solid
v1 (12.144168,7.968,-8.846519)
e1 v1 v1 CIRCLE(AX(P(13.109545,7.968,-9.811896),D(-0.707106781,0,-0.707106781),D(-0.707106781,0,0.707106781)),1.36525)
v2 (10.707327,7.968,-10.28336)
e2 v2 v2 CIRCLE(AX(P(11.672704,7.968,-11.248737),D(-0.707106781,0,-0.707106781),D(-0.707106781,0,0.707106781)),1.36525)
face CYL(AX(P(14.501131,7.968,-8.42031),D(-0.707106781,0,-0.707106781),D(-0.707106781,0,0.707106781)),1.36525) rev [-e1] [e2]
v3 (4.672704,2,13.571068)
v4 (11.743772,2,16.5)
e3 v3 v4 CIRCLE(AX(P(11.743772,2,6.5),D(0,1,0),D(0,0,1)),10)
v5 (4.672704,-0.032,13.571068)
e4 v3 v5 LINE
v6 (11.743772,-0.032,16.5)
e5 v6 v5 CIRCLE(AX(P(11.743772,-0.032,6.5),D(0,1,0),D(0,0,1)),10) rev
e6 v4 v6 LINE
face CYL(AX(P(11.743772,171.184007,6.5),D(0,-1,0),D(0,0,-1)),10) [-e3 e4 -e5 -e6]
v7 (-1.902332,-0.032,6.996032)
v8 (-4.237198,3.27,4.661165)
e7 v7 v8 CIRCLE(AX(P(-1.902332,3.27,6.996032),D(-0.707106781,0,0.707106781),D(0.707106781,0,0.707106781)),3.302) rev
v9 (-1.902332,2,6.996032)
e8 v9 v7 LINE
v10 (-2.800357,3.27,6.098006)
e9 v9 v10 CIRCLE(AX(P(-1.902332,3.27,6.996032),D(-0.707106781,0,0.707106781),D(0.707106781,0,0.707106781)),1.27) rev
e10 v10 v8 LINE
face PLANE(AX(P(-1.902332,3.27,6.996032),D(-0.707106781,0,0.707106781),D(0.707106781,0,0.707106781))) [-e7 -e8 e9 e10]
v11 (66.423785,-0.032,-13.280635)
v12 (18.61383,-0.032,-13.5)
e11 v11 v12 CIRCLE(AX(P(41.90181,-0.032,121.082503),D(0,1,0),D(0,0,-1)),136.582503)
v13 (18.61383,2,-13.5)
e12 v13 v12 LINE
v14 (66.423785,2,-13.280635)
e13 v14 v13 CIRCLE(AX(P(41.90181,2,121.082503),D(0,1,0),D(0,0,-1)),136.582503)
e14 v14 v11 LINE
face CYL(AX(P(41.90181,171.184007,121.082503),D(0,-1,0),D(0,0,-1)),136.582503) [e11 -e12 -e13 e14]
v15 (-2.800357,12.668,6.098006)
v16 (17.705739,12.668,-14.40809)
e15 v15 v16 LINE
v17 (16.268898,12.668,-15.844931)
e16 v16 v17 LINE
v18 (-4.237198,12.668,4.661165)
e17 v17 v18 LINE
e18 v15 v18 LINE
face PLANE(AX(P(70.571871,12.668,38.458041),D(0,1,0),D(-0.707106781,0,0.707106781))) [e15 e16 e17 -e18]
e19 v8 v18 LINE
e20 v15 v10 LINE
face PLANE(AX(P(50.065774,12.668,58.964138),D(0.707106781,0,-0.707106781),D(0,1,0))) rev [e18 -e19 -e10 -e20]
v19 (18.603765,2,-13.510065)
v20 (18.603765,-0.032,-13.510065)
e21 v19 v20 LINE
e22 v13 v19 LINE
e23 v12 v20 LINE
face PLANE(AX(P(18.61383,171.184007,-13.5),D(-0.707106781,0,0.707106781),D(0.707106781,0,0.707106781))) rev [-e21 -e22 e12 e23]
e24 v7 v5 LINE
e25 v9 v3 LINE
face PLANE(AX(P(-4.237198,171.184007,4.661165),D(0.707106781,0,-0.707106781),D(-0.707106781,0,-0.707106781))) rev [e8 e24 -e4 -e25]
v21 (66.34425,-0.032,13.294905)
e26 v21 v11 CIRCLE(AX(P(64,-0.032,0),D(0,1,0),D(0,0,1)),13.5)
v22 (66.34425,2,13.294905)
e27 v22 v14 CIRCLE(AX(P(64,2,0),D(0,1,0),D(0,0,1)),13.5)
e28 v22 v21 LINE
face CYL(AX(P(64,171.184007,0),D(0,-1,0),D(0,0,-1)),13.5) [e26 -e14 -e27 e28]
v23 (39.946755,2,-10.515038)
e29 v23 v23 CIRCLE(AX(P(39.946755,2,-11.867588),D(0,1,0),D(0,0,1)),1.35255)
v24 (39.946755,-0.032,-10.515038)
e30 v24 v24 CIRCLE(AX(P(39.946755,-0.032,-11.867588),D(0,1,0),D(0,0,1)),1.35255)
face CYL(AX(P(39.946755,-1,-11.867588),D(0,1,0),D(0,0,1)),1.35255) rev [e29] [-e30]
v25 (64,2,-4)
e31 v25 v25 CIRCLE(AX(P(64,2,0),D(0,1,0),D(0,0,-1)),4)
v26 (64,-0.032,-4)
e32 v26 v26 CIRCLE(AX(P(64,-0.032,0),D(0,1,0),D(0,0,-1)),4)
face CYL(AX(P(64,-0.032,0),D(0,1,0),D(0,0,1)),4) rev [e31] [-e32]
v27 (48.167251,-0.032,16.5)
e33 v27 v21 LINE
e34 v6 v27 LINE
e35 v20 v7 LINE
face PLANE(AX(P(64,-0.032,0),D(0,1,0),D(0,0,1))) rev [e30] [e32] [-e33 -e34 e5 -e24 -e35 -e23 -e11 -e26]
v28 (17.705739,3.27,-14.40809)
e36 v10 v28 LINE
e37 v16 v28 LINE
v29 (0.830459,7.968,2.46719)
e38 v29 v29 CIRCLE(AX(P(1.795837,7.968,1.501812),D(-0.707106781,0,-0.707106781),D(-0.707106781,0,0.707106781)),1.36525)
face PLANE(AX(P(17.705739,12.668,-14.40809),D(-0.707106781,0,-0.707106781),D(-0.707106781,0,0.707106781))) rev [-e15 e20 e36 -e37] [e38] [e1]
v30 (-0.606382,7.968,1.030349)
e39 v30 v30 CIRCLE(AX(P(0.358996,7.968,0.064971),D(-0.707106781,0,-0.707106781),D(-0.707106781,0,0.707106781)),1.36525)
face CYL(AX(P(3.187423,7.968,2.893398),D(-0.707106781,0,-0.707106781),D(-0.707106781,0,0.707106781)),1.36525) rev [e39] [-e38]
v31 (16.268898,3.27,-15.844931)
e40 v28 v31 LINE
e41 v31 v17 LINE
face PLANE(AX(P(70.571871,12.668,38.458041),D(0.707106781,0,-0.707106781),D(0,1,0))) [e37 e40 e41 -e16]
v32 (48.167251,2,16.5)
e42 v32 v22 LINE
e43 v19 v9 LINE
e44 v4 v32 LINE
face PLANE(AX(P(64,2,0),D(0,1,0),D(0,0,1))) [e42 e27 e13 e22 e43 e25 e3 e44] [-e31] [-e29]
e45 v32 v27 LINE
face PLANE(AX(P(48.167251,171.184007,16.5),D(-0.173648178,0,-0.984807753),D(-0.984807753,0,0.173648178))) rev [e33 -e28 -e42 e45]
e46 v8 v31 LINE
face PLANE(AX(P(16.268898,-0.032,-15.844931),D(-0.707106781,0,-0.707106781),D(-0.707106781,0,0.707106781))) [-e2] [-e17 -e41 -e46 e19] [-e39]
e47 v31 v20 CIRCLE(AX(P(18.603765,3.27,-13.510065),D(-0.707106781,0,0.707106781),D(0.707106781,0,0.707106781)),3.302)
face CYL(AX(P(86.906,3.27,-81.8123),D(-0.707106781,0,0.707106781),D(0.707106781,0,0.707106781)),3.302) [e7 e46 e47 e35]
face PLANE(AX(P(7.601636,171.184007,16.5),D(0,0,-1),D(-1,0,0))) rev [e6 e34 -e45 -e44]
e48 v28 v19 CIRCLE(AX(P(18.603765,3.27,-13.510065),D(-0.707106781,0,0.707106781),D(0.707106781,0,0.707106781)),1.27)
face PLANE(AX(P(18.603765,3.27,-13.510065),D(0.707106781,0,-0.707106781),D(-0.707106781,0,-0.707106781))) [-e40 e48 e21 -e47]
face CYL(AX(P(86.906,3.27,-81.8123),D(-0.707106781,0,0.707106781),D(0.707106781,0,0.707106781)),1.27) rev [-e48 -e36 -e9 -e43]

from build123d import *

# Parameters (mm, degrees)
SKETCH1_R                  = 4
BOSS_EXTRUDE1_DEPTH        = 2.032
BOSS_EXTRUDE3_DEPTH        = 10.668
SKETCH12_R                 = 1.36525
CUT_EXTRUDE2_DEPTH         = 4
CUT_EXTRUDE3_DEPTH         = 6
CUT_EXTRUDE3_DEPTH_BACK    = 1
SKETCH14_R                 = 1.35255
FILLET1_R                  = 10
FLATTEN_BENDS1_START       = 2
FLATTEN_BENDS1_DEPTH       = 10.668
FLATTEN_BENDS1_START_2     = -0.032
FLATTEN_BENDS1_2_OUTLINE_R = 1.36525
FLATTEN_BENDS1_2_DEPTH     = 2.032
PROCESS_BENDS1_START       = -9.067864684
PROCESS_BENDS1_OUTLINE_W   = 29
PROCESS_BENDS1_OUTLINE_H   = 2.032
PROCESS_BENDS1_DEPTH       = 9.398
PROCESS_BENDS1_START_2     = 0.620942425
PROCESS_BENDS1_2_OUTLINE_W = 29
PROCESS_BENDS1_2_OUTLINE_H = 10.668
PROCESS_BENDS1_2_OUTLINE_R = 1.36525
PROCESS_BENDS1_2_DEPTH     = 1.71084748
PROCESS_BENDS1_START_3     = 0.330135316
PROCESS_BENDS1_3_OUTLINE_W = 29
PROCESS_BENDS1_3_OUTLINE_H = 2.032
PROCESS_BENDS1_3_DEPTH     = 0.184274429
PROCESS_BENDS1_START_4     = 0.299789905
PROCESS_BENDS1_4_OUTLINE_W = 29
PROCESS_BENDS1_4_OUTLINE_H = 10.668
PROCESS_BENDS1_4_OUTLINE_R = 1.36525
PROCESS_BENDS1_4_DEPTH     = 3.302
PROCESS_BENDS1_START_5     = -6.292093187
PROCESS_BENDS1_5_DEPTH     = 29


with BuildPart() as part:
    # Sketch1 → Boss-Extrude1 (new body)
    with BuildSketch(Plane(origin=(0, 2, 0), x_dir=(1, 0, 0), z_dir=(0, 1, 0))):
        with BuildLine():
            Line((16.268898369, 15.844931419), (-4.237198285, -4.661165235))
            Line((-4.237198285, -4.661165235), (7.60163648, -16.5))
            Line((7.60163648, -16.5), (48.167251499, -16.5))
            Line((48.167251499, -16.5), (66.344250399, -13.294904666))
            ThreePointArc((66.344250399, -13.294904666), (77.499939542, -0.040402458), (66.423785357, 13.280634945))
            ThreePointArc((66.423785357, 13.280634945), (42.528480772, 15.498562339), (18.613829789, 13.5))
            Line((18.613829789, 13.5), (16.268898369, 15.844931419))
        make_face()
        with Locations(Location((64, 0, 0), (0, 0, 90))):
            Circle(SKETCH1_R, mode=Mode.SUBTRACT)
    extrude(amount=-BOSS_EXTRUDE1_DEPTH)

    # Sketch5 → Boss-Extrude3 (add)
    with BuildSketch(Plane(origin=(0, 2, 0), x_dir=(1, 0, 0), z_dir=(0, 1, 0))):
        Polygon((16.268898369, 15.844931419), (-4.237198285, -4.661165235), (-2.800357306, -6.098006215), (17.705739349, 14.40809044), align=None)
    extrude(amount=BOSS_EXTRUDE3_DEPTH)

    # Sketch12 → Cut-Extrude2 (cut)
    with BuildSketch(Plane(origin=(0.211983475, 0, 0.211983475), x_dir=(-0.7071067811865475, 0, 0.7071067811865477), z_dir=(-0.7071067811865477, 0, -0.7071067811865475))):
        with Locations((-16.207906813, 7.968)):
            Circle(SKETCH12_R)
        with Locations((-0.207906813, 7.968)):
            Circle(SKETCH12_R)
    extrude(amount=-CUT_EXTRUDE2_DEPTH, mode=Mode.SUBTRACT)

    # Sketch14 → Cut-Extrude3 (cut, two sides: drawn at the far end of the back side and taken through both)
    with BuildSketch(Plane(origin=(0, 0, 0), x_dir=(1, 0, 0), z_dir=(0, 1, 0)).offset(-CUT_EXTRUDE3_DEPTH_BACK)):
        with Locations(Location((39.946755384, 11.867587507, 0), (0, 0, 270))):
            Circle(SKETCH14_R)
    extrude(amount=CUT_EXTRUDE3_DEPTH + CUT_EXTRUDE3_DEPTH_BACK, mode=Mode.SUBTRACT)

    # Fillet1
    fillet1_edges = [part.edges().sort_by_distance(p)[0] for p in [
        (7.60163648, 0.984, 16.5),
    ]]
    fillet(fillet1_edges, radius=FILLET1_R)

    # Flatten-Bends1: read off the stored shape, not the designer's step
    # Flatten-Bends1 outline → Flatten-Bends1 (cut)
    with BuildSketch(Plane(origin=(0, 0, 0), x_dir=(1, 0, 0), z_dir=(0, 1, 0)).offset(FLATTEN_BENDS1_START)):
        Polygon((17.705739349, 14.40809044), (16.290355815, 15.823473974), (16.268898369, 15.844931419), (-4.237198285, -4.661165235), (-2.800357306, -6.098006215), align=None)
    extrude(amount=FLATTEN_BENDS1_DEPTH, mode=Mode.SUBTRACT)

    # Flatten-Bends1 2 outline → Flatten-Bends1 2 (add)
    with BuildSketch(Plane(origin=(0, 0, 0), x_dir=(1, 0, 0), z_dir=(0, 1, 0)).offset(FLATTEN_BENDS1_START_2)):
        Polygon((-4.237198285, -4.661165235), (16.268898369, 15.844931419), (9.644966285, 22.468863503), (-10.861130369, 1.962766849), align=None)
        with Locations((-2.94153442, 3.235559055)):
            Circle(FLATTEN_BENDS1_2_OUTLINE_R, mode=Mode.SUBTRACT)
        with Locations((8.372174079, 14.549267554)):
            Circle(FLATTEN_BENDS1_2_OUTLINE_R, mode=Mode.SUBTRACT)
    extrude(amount=FLATTEN_BENDS1_2_DEPTH)

    # Process-Bends1: read off the stored shape, not the designer's step
    # Process-Bends1 outline → Process-Bends1 (cut)
    with BuildSketch(Plane(origin=(0, 0, 0), x_dir=(0.7071067811865474, 0, -0.7071067811865477), z_dir=(0.7071067811865476, 0, 0.7071067811865476)).offset(PROCESS_BENDS1_START)):
        with Locations((8.207906813, 0.984)):
            Rectangle(PROCESS_BENDS1_OUTLINE_W, PROCESS_BENDS1_OUTLINE_H)
    extrude(amount=PROCESS_BENDS1_DEPTH, mode=Mode.SUBTRACT)

    # Process-Bends1 2 outline → Process-Bends1 2 (add)
    with BuildSketch(Plane(origin=(0, 0, 0), x_dir=(0.7071067811865474, 0, -0.7071067811865477), z_dir=(0.7071067811865476, 0, 0.7071067811865476)).offset(PROCESS_BENDS1_START_2)):
        with Locations((8.207906813, 7.334)):
            Rectangle(PROCESS_BENDS1_2_OUTLINE_W, PROCESS_BENDS1_2_OUTLINE_H)
        with Locations((0.207906813, 7.968)):
            Circle(PROCESS_BENDS1_2_OUTLINE_R, mode=Mode.SUBTRACT)
        with Locations((16.207906813, 7.968)):
            Circle(PROCESS_BENDS1_2_OUTLINE_R, mode=Mode.SUBTRACT)
    extrude(amount=PROCESS_BENDS1_2_DEPTH)

    # Process-Bends1 3 outline → Process-Bends1 3 (cut)
    with BuildSketch(Plane(origin=(0, 0, 0), x_dir=(0.7071067811865474, 0, -0.7071067811865477), z_dir=(0.7071067811865476, 0, 0.7071067811865476)).offset(PROCESS_BENDS1_START_3)):
        with Locations((8.207906813, 0.984)):
            Rectangle(PROCESS_BENDS1_3_OUTLINE_W, PROCESS_BENDS1_3_OUTLINE_H)
    extrude(amount=PROCESS_BENDS1_3_DEPTH, mode=Mode.SUBTRACT)

    # Process-Bends1 4 outline → Process-Bends1 4 (add)
    with BuildSketch(Plane(origin=(0, 0, 0), x_dir=(0.7071067811865474, 0, -0.7071067811865477), z_dir=(0.7071067811865476, 0, 0.7071067811865476)).offset(PROCESS_BENDS1_START_4)):
        with Locations((8.207906813, 7.334)):
            Rectangle(PROCESS_BENDS1_4_OUTLINE_W, PROCESS_BENDS1_4_OUTLINE_H)
        with Locations((0.207906813, 7.968)):
            Circle(PROCESS_BENDS1_4_OUTLINE_R, mode=Mode.SUBTRACT)
        with Locations((16.207906813, 7.968)):
            Circle(PROCESS_BENDS1_4_OUTLINE_R, mode=Mode.SUBTRACT)
    extrude(amount=PROCESS_BENDS1_4_DEPTH)

    # Process-Bends1 5 outline → Process-Bends1 5 (cut)
    with BuildSketch(Plane(origin=(0, 0, 0), x_dir=(0.707106781186548, 0, 0.707106781186547), z_dir=(0.707106781186547, 0, -0.707106781186548)).offset(PROCESS_BENDS1_START_5)):
        with BuildLine():
            ThreePointArc((3.601789905, -2), (2.703764293, -2.371974388), (2.331789905, -3.27))
            Line((2.331789905, -3.27), (2.331789905, -12.668))
            Line((2.331789905, -12.668), (3.601789905, -12.668))
            Line((3.601789905, -12.668), (3.601789905, -2))
        make_face()
        with BuildLine():
            Line((0.299789905, -2), (0.299789905, -3.27))
            ThreePointArc((0.299789905, -3.27), (1.266923314, -0.935133409), (3.601789905, 0.032))
            Line((3.601789905, 0.032), (0.514409745, 0.032))
            Line((0.514409745, 0.032), (0.514409745, -2))
            Line((0.514409745, -2), (0.299789905, -2))
        make_face()
    extrude(amount=PROCESS_BENDS1_5_DEPTH, mode=Mode.SUBTRACT)


solid = part.part
